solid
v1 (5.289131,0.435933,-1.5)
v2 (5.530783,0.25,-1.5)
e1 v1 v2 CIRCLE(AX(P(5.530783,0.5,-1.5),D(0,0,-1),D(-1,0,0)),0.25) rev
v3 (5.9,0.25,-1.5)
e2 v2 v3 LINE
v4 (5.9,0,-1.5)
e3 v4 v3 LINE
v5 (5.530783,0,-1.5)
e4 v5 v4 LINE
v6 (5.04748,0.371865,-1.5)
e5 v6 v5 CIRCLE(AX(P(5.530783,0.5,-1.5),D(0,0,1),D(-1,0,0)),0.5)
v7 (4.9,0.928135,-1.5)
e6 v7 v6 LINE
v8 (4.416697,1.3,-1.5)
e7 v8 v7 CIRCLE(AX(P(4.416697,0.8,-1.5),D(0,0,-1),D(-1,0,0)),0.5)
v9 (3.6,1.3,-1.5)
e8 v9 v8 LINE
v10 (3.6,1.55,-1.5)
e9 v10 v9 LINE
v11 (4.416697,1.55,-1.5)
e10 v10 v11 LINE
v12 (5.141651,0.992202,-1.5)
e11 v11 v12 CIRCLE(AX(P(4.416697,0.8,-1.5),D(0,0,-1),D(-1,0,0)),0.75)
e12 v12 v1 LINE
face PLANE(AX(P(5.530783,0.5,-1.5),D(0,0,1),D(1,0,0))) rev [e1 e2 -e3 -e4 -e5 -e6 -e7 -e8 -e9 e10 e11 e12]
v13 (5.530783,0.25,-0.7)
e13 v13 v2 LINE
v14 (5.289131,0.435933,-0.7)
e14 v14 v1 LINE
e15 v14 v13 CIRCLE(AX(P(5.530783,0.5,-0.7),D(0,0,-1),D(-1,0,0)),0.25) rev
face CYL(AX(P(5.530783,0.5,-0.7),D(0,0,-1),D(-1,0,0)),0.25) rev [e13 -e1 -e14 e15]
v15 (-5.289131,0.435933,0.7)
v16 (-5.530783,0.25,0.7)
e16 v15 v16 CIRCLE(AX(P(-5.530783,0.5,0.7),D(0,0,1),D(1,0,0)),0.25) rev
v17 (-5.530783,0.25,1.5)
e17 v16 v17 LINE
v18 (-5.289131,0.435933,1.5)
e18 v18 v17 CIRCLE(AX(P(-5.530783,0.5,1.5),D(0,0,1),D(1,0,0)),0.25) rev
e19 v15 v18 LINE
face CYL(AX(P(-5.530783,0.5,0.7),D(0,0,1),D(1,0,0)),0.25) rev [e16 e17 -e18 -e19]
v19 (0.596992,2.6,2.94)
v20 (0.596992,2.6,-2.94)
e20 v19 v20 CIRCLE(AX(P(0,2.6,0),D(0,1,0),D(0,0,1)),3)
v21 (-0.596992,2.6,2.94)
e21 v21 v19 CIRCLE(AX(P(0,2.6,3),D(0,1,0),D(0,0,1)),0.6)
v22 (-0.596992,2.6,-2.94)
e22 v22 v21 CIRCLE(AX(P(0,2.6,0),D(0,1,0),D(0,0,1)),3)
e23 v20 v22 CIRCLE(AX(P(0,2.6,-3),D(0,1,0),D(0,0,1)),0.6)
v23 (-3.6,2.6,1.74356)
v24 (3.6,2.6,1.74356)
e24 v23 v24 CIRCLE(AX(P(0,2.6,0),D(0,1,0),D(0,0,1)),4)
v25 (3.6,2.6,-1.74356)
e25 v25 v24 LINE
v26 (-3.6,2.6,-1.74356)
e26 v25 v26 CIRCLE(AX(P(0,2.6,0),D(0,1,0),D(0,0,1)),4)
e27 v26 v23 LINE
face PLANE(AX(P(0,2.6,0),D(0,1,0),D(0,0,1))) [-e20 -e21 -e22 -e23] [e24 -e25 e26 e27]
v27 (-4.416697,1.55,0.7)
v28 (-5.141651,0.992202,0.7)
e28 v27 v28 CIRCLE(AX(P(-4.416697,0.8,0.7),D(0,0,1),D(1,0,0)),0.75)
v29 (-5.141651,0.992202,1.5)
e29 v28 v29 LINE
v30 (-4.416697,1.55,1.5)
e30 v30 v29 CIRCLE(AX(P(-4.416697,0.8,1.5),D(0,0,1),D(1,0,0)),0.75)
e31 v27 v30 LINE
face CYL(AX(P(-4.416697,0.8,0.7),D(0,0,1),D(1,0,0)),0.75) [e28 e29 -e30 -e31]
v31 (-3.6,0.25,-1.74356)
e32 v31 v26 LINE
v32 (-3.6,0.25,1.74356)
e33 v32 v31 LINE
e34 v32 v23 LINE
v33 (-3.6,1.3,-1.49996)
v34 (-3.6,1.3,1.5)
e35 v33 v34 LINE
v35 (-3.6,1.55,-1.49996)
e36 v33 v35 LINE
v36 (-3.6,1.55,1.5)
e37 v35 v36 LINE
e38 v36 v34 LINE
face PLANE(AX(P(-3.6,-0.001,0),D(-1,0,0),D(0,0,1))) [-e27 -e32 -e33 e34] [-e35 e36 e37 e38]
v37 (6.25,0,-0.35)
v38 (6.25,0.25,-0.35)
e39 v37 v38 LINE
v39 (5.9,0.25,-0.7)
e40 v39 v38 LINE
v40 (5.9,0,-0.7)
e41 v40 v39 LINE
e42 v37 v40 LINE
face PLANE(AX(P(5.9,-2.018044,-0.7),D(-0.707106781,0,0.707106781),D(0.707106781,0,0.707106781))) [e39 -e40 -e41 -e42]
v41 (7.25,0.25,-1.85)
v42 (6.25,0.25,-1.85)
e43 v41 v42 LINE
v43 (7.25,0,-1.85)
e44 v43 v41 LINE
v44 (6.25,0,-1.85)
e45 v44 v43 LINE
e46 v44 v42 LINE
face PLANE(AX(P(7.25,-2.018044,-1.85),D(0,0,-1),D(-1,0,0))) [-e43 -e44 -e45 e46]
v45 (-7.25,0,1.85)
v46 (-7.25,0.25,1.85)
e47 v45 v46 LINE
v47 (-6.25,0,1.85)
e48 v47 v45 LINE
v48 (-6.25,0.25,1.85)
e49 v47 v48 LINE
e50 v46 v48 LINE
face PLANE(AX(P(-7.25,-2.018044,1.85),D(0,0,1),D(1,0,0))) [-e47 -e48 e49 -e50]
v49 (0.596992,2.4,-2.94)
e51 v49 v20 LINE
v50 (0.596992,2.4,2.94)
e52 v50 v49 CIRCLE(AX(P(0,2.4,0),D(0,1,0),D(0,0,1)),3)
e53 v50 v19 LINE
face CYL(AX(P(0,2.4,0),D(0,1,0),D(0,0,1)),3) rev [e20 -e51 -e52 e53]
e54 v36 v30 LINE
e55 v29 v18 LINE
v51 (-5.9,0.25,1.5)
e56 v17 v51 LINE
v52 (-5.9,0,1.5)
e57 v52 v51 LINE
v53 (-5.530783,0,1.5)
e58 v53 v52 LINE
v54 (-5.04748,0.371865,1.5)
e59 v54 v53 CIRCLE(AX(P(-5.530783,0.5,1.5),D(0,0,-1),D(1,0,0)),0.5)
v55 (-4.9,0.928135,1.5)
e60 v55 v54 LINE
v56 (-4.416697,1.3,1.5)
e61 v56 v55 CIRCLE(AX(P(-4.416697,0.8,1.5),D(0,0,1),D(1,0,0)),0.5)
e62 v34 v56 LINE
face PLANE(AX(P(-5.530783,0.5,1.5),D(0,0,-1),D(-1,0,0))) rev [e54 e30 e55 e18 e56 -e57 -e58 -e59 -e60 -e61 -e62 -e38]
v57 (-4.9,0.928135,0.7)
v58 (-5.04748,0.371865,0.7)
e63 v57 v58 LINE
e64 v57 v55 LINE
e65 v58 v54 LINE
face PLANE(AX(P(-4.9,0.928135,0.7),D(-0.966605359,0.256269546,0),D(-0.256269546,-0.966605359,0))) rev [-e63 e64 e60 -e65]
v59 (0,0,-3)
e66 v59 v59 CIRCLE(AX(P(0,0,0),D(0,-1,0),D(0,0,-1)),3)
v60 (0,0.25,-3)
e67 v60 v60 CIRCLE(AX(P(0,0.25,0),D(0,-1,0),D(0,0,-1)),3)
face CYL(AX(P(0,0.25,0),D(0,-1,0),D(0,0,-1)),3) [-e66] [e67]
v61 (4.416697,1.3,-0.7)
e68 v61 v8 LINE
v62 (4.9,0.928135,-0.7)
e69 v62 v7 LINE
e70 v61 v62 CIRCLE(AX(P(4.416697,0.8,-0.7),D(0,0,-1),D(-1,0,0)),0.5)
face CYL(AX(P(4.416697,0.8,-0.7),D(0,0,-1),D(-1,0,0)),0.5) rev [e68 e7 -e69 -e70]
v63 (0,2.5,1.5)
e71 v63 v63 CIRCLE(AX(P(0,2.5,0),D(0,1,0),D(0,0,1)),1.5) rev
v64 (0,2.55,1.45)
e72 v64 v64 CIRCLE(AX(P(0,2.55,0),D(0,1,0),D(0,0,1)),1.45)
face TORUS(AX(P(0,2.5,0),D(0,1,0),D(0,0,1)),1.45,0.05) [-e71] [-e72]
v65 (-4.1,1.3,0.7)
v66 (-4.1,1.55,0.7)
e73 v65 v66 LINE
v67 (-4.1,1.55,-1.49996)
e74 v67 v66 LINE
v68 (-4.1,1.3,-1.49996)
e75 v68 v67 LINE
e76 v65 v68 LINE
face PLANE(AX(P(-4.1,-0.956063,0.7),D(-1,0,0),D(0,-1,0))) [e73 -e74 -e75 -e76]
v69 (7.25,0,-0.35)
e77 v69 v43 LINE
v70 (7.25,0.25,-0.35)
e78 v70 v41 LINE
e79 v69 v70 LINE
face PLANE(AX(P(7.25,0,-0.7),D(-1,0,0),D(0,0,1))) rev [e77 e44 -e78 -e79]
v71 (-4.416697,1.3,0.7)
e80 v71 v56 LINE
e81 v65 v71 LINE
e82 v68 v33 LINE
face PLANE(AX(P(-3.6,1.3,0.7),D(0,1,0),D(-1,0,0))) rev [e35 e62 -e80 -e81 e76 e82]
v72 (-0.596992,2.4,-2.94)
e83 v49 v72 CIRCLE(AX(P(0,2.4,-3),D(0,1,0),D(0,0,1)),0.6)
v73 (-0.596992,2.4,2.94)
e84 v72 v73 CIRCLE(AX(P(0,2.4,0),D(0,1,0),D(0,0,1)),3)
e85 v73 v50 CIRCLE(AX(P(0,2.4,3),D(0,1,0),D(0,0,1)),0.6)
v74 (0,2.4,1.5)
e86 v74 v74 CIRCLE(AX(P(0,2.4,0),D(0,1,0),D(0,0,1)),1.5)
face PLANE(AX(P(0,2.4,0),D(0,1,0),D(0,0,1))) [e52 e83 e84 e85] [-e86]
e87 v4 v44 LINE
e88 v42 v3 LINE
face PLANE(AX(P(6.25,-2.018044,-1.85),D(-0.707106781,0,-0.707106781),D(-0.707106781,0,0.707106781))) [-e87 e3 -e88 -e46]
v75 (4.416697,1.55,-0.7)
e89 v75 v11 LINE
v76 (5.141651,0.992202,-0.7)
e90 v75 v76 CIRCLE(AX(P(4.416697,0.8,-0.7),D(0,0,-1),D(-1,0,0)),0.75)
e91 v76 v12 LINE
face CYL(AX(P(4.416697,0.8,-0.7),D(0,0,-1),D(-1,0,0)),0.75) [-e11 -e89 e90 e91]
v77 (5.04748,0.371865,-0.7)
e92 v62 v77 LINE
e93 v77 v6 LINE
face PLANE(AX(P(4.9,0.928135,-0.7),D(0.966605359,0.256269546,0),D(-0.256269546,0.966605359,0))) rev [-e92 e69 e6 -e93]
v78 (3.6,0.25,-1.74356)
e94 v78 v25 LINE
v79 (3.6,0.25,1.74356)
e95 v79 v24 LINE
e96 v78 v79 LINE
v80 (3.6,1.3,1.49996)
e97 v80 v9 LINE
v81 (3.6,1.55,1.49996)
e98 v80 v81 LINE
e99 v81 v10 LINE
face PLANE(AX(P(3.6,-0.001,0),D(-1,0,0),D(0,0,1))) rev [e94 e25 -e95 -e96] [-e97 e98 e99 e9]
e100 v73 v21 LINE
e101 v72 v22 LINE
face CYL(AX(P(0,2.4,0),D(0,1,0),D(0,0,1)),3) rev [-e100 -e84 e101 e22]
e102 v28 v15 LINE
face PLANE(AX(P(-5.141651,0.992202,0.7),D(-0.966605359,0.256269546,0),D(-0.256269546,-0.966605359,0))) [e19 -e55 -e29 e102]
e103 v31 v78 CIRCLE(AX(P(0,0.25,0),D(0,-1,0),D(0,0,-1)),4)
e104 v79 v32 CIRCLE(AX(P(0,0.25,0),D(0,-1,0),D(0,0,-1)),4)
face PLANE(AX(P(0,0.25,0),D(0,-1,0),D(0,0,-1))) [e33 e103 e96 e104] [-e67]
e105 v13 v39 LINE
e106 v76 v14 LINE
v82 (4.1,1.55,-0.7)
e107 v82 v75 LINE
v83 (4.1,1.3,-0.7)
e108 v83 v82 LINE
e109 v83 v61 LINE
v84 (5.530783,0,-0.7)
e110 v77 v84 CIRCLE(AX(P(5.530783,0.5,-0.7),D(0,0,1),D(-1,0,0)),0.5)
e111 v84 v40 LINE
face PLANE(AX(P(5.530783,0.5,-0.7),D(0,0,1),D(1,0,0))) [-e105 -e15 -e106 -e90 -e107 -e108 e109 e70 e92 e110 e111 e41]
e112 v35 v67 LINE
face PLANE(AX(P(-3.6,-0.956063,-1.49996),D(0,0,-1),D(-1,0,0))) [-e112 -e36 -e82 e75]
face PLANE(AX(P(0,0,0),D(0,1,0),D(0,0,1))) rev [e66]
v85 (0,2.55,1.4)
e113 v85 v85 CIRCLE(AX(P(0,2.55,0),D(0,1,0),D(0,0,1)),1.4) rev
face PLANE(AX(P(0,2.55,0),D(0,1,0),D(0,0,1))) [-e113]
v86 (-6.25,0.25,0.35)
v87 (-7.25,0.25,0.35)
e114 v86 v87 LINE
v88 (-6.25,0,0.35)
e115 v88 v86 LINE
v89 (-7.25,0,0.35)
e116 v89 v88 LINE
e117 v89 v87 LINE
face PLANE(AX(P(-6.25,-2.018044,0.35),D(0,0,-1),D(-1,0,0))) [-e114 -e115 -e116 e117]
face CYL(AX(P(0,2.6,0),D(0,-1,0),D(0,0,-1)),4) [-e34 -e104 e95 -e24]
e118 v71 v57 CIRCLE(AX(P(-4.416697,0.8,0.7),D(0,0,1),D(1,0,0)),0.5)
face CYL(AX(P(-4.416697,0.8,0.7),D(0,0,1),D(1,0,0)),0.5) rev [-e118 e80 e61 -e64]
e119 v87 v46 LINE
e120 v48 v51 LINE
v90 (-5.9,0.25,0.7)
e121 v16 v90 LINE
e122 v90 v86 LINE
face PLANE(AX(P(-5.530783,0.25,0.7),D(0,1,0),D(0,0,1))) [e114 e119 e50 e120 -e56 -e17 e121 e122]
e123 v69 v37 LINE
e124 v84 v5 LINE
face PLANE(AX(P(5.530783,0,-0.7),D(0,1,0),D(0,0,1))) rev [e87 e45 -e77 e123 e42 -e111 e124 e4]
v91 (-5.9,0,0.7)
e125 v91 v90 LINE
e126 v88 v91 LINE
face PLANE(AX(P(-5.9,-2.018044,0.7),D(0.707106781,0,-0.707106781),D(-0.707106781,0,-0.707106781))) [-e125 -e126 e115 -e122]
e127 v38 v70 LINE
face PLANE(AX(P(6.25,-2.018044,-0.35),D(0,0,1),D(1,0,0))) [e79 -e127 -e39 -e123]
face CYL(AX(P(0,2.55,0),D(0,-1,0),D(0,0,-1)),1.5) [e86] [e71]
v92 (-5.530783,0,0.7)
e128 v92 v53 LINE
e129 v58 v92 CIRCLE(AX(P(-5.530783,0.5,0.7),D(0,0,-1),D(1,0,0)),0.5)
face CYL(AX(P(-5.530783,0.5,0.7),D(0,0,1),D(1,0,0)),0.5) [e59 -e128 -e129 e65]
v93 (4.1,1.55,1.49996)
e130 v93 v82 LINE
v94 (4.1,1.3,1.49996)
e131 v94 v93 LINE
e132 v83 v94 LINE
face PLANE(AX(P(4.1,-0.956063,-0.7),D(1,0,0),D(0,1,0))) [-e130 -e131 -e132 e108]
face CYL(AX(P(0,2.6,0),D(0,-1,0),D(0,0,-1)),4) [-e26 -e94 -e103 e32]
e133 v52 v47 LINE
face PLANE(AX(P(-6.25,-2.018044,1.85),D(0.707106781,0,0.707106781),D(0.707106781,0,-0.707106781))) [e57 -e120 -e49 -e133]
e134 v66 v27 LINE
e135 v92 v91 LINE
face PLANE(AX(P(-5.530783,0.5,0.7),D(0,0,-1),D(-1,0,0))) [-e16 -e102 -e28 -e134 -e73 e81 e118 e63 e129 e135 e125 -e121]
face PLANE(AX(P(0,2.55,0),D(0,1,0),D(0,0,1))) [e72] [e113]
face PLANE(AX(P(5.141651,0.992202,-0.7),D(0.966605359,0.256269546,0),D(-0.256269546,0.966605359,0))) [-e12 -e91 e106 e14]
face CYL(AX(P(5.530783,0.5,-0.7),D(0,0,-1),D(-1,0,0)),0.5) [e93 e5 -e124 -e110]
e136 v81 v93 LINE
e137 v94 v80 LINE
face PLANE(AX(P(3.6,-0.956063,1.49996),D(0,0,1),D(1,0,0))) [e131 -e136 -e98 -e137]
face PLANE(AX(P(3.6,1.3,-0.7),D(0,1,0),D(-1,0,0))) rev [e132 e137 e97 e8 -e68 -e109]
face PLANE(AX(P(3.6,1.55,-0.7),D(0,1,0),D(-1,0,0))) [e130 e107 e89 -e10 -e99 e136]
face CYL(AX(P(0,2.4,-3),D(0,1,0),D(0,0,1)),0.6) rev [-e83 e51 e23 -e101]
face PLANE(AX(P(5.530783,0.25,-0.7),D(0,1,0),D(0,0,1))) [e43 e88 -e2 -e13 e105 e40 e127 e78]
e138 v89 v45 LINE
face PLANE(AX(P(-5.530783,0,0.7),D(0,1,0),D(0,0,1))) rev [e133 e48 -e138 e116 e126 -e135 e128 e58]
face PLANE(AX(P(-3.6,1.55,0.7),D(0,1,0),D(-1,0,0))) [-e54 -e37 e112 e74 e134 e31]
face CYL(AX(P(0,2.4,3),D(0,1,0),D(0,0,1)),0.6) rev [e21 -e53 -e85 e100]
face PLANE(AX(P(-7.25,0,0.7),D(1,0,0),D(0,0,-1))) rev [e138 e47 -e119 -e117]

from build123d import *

# Parameters (mm, degrees)
SKETCH1_R           = 4
EXTRUDE1_DEPTH      = 2.6
EXTRUDE2_START      = -4
EXTRUDE2_DEPTH      = 5
CUT_EXTRUDE1_DEPTH  = 0.2
SKETCH12_R          = 1.5
BOSS_EXTRUDE3_DEPTH = 0.15
FILLET4_R           = 0.05
EXTRUDE_THIN1_START = 1.1
EXTRUDE_THIN1_DEPTH = 0.4
EXTRUDE3_DEPTH      = 0.25
SKETCH10_R          = 3
EXTRUDE6_DEPTH      = 0.25
SKETCH13_W          = 0.5
SKETCH13_H          = 2.199959577
BOSS_EXTRUDE4_DEPTH = 0.25
CIRPATTERN1_COUNT   = 2


with BuildPart() as part:
    # Sketch1 → Extrude1 (new body)
    with BuildSketch(Plane(origin=(0, 0, 0), x_dir=(1, 0, 0), z_dir=(0, 1, 0))):
        with Locations(Location((0, 0, 0), (0, 0, 270))):
            Circle(SKETCH1_R)
    extrude(amount=EXTRUDE1_DEPTH)

    # Extrude2: read off the stored shape, not the designer's step
    # Extrude2 outline → Extrude2 (cut)
    with BuildSketch(Plane(origin=(0, 2.6, 0), x_dir=(1, 0, 0), z_dir=(0, 1, 0)).offset(EXTRUDE2_START)):
        with BuildLine():
            Line((-3.6, -1.743559577), (-3.6, 1.743559577))
            ThreePointArc((-3.6, 1.743559577), (-4, 0), (-3.6, -1.743559577))
        make_face()
        with BuildLine():
            ThreePointArc((3.6, -1.743559577), (4, 0), (3.6, 1.743559577))
            Line((3.6, 1.743559577), (3.6, -1.743559577))
        make_face()
    extrude(amount=EXTRUDE2_DEPTH, mode=Mode.SUBTRACT)

    # Sketch2<3> → Cut-Extrude1 (cut)
    with BuildSketch(Plane(origin=(0, 2.6, 0), x_dir=(1, 0, 0), z_dir=(0, 1, 0))):
        with BuildLine():
            ThreePointArc((-0.596992462, -2.94), (0, -3.6), (0.596992462, -2.94))
            ThreePointArc((0.596992462, -2.94), (3, 0), (0.596992462, 2.94))
            ThreePointArc((0.596992462, 2.94), (0, 3.6), (-0.596992462, 2.94))
            ThreePointArc((-0.596992462, 2.94), (-3, 0), (-0.596992462, -2.94))
        make_face()
    extrude(amount=-CUT_EXTRUDE1_DEPTH, mode=Mode.SUBTRACT)

    # Sketch12 → Boss-Extrude3 (add)
    with BuildSketch(Plane(origin=(0, 2.4, 0), x_dir=(1, 0, 0), z_dir=(0, 1, 0))):
        with Locations(Location((0, 0, 0), (0, 0, 270))):
            Circle(SKETCH12_R)
    extrude(amount=BOSS_EXTRUDE3_DEPTH)

    # Fillet4
    fillet4_edges = [part.edges().sort_by_distance(p)[0] for p in [
        (0, 2.55, -1.5),
    ]]
    fillet(fillet4_edges, radius=FILLET4_R)

    # Sketch6 → Extrude-Thin1 (add, symmetric)
    with BuildSketch(Plane.XY.offset(EXTRUDE_THIN1_START)):
        with BuildLine():
            Line((-3.6, 1.3), (-4.416697321, 1.3))
            ThreePointArc((-4.416697321, 1.3), (-4.721601087, 1.19627477), (-4.9, 0.928134773))
            Line((-4.9, 0.928134773), (-5.047479985, 0.371865227))
            ThreePointArc((-5.047479985, 0.371865227), (-5.225878898, 0.10372523), (-5.530782665, 0))
            Line((-5.530782665, 0), (-7.25, 0))
            Line((-7.25, 0), (-7.25, 0.25))
            Line((-7.25, 0.25), (-5.530782665, 0.25))
            ThreePointArc((-5.530782665, 0.25), (-5.378330782, 0.301862615), (-5.289131325, 0.435932613))
            Line((-5.289131325, 0.435932613), (-5.14165134, 0.99220216))
            ThreePointArc((-5.14165134, 0.99220216), (-4.87405297, 1.394412155), (-4.416697321, 1.55))
            Line((-4.416697321, 1.55), (-3.6, 1.55))
            Line((-3.6, 1.55), (-3.6, 1.3))
        make_face()
    extrude_thin1 = extrude(amount=EXTRUDE_THIN1_DEPTH, both=True)

    # Sketch7 → Extrude3 (add)
    with BuildSketch(Plane(origin=(0, 0.25, 0), x_dir=(1, 0, 0), z_dir=(0, 1, 0))):
        Polygon((-5.9, -0.7), (-6.25, -0.35), (-7.25, -0.35), (-7.25, -1.85), (-6.25, -1.85), (-5.9, -1.5), align=None)
    extrude3 = extrude(amount=-EXTRUDE3_DEPTH)

    # Sketch10 → Extrude6 (cut)
    with BuildSketch(Plane.XZ):
        with BuildLine():
            Line((3.6, -1.743559577), (3.6, 1.743559577))
            ThreePointArc((3.6, 1.743559577), (0, 4), (-3.6, 1.743559577))
            Line((-3.6, 1.743559577), (-3.6, -1.743559577))
            ThreePointArc((-3.6, -1.743559577), (0, -4), (3.6, -1.743559577))
        make_face()
        with Locations(Location((0, 0, 0), (0, 0, 270))):
            Circle(SKETCH10_R, mode=Mode.SUBTRACT)
    extrude(amount=-EXTRUDE6_DEPTH, mode=Mode.SUBTRACT)

    # Sketch13 → Boss-Extrude4 (add)
    with BuildSketch(Plane(origin=(0, 1.55, 0), x_dir=(1, 0, 0), z_dir=(0, 1, 0))):
        with Locations((-3.85, 0.399979788)):
            Rectangle(SKETCH13_W, SKETCH13_H)
    boss_extrude4 = extrude(amount=-BOSS_EXTRUDE4_DEPTH)

    # CirPattern1: Extrude-Thin1, Extrude3, Boss-Extrude4 ×2 about axis
    cirpattern1_axis = Axis((0, 0, 0), (0, 1, 0))
    add([extrude_thin1.rotate(cirpattern1_axis, i * 360 / CIRPATTERN1_COUNT) for i in range(1, CIRPATTERN1_COUNT)])
    add([extrude3.rotate(cirpattern1_axis, i * 360 / CIRPATTERN1_COUNT) for i in range(1, CIRPATTERN1_COUNT)])
    add([boss_extrude4.rotate(cirpattern1_axis, i * 360 / CIRPATTERN1_COUNT) for i in range(1, CIRPATTERN1_COUNT)])


solid = part.part
